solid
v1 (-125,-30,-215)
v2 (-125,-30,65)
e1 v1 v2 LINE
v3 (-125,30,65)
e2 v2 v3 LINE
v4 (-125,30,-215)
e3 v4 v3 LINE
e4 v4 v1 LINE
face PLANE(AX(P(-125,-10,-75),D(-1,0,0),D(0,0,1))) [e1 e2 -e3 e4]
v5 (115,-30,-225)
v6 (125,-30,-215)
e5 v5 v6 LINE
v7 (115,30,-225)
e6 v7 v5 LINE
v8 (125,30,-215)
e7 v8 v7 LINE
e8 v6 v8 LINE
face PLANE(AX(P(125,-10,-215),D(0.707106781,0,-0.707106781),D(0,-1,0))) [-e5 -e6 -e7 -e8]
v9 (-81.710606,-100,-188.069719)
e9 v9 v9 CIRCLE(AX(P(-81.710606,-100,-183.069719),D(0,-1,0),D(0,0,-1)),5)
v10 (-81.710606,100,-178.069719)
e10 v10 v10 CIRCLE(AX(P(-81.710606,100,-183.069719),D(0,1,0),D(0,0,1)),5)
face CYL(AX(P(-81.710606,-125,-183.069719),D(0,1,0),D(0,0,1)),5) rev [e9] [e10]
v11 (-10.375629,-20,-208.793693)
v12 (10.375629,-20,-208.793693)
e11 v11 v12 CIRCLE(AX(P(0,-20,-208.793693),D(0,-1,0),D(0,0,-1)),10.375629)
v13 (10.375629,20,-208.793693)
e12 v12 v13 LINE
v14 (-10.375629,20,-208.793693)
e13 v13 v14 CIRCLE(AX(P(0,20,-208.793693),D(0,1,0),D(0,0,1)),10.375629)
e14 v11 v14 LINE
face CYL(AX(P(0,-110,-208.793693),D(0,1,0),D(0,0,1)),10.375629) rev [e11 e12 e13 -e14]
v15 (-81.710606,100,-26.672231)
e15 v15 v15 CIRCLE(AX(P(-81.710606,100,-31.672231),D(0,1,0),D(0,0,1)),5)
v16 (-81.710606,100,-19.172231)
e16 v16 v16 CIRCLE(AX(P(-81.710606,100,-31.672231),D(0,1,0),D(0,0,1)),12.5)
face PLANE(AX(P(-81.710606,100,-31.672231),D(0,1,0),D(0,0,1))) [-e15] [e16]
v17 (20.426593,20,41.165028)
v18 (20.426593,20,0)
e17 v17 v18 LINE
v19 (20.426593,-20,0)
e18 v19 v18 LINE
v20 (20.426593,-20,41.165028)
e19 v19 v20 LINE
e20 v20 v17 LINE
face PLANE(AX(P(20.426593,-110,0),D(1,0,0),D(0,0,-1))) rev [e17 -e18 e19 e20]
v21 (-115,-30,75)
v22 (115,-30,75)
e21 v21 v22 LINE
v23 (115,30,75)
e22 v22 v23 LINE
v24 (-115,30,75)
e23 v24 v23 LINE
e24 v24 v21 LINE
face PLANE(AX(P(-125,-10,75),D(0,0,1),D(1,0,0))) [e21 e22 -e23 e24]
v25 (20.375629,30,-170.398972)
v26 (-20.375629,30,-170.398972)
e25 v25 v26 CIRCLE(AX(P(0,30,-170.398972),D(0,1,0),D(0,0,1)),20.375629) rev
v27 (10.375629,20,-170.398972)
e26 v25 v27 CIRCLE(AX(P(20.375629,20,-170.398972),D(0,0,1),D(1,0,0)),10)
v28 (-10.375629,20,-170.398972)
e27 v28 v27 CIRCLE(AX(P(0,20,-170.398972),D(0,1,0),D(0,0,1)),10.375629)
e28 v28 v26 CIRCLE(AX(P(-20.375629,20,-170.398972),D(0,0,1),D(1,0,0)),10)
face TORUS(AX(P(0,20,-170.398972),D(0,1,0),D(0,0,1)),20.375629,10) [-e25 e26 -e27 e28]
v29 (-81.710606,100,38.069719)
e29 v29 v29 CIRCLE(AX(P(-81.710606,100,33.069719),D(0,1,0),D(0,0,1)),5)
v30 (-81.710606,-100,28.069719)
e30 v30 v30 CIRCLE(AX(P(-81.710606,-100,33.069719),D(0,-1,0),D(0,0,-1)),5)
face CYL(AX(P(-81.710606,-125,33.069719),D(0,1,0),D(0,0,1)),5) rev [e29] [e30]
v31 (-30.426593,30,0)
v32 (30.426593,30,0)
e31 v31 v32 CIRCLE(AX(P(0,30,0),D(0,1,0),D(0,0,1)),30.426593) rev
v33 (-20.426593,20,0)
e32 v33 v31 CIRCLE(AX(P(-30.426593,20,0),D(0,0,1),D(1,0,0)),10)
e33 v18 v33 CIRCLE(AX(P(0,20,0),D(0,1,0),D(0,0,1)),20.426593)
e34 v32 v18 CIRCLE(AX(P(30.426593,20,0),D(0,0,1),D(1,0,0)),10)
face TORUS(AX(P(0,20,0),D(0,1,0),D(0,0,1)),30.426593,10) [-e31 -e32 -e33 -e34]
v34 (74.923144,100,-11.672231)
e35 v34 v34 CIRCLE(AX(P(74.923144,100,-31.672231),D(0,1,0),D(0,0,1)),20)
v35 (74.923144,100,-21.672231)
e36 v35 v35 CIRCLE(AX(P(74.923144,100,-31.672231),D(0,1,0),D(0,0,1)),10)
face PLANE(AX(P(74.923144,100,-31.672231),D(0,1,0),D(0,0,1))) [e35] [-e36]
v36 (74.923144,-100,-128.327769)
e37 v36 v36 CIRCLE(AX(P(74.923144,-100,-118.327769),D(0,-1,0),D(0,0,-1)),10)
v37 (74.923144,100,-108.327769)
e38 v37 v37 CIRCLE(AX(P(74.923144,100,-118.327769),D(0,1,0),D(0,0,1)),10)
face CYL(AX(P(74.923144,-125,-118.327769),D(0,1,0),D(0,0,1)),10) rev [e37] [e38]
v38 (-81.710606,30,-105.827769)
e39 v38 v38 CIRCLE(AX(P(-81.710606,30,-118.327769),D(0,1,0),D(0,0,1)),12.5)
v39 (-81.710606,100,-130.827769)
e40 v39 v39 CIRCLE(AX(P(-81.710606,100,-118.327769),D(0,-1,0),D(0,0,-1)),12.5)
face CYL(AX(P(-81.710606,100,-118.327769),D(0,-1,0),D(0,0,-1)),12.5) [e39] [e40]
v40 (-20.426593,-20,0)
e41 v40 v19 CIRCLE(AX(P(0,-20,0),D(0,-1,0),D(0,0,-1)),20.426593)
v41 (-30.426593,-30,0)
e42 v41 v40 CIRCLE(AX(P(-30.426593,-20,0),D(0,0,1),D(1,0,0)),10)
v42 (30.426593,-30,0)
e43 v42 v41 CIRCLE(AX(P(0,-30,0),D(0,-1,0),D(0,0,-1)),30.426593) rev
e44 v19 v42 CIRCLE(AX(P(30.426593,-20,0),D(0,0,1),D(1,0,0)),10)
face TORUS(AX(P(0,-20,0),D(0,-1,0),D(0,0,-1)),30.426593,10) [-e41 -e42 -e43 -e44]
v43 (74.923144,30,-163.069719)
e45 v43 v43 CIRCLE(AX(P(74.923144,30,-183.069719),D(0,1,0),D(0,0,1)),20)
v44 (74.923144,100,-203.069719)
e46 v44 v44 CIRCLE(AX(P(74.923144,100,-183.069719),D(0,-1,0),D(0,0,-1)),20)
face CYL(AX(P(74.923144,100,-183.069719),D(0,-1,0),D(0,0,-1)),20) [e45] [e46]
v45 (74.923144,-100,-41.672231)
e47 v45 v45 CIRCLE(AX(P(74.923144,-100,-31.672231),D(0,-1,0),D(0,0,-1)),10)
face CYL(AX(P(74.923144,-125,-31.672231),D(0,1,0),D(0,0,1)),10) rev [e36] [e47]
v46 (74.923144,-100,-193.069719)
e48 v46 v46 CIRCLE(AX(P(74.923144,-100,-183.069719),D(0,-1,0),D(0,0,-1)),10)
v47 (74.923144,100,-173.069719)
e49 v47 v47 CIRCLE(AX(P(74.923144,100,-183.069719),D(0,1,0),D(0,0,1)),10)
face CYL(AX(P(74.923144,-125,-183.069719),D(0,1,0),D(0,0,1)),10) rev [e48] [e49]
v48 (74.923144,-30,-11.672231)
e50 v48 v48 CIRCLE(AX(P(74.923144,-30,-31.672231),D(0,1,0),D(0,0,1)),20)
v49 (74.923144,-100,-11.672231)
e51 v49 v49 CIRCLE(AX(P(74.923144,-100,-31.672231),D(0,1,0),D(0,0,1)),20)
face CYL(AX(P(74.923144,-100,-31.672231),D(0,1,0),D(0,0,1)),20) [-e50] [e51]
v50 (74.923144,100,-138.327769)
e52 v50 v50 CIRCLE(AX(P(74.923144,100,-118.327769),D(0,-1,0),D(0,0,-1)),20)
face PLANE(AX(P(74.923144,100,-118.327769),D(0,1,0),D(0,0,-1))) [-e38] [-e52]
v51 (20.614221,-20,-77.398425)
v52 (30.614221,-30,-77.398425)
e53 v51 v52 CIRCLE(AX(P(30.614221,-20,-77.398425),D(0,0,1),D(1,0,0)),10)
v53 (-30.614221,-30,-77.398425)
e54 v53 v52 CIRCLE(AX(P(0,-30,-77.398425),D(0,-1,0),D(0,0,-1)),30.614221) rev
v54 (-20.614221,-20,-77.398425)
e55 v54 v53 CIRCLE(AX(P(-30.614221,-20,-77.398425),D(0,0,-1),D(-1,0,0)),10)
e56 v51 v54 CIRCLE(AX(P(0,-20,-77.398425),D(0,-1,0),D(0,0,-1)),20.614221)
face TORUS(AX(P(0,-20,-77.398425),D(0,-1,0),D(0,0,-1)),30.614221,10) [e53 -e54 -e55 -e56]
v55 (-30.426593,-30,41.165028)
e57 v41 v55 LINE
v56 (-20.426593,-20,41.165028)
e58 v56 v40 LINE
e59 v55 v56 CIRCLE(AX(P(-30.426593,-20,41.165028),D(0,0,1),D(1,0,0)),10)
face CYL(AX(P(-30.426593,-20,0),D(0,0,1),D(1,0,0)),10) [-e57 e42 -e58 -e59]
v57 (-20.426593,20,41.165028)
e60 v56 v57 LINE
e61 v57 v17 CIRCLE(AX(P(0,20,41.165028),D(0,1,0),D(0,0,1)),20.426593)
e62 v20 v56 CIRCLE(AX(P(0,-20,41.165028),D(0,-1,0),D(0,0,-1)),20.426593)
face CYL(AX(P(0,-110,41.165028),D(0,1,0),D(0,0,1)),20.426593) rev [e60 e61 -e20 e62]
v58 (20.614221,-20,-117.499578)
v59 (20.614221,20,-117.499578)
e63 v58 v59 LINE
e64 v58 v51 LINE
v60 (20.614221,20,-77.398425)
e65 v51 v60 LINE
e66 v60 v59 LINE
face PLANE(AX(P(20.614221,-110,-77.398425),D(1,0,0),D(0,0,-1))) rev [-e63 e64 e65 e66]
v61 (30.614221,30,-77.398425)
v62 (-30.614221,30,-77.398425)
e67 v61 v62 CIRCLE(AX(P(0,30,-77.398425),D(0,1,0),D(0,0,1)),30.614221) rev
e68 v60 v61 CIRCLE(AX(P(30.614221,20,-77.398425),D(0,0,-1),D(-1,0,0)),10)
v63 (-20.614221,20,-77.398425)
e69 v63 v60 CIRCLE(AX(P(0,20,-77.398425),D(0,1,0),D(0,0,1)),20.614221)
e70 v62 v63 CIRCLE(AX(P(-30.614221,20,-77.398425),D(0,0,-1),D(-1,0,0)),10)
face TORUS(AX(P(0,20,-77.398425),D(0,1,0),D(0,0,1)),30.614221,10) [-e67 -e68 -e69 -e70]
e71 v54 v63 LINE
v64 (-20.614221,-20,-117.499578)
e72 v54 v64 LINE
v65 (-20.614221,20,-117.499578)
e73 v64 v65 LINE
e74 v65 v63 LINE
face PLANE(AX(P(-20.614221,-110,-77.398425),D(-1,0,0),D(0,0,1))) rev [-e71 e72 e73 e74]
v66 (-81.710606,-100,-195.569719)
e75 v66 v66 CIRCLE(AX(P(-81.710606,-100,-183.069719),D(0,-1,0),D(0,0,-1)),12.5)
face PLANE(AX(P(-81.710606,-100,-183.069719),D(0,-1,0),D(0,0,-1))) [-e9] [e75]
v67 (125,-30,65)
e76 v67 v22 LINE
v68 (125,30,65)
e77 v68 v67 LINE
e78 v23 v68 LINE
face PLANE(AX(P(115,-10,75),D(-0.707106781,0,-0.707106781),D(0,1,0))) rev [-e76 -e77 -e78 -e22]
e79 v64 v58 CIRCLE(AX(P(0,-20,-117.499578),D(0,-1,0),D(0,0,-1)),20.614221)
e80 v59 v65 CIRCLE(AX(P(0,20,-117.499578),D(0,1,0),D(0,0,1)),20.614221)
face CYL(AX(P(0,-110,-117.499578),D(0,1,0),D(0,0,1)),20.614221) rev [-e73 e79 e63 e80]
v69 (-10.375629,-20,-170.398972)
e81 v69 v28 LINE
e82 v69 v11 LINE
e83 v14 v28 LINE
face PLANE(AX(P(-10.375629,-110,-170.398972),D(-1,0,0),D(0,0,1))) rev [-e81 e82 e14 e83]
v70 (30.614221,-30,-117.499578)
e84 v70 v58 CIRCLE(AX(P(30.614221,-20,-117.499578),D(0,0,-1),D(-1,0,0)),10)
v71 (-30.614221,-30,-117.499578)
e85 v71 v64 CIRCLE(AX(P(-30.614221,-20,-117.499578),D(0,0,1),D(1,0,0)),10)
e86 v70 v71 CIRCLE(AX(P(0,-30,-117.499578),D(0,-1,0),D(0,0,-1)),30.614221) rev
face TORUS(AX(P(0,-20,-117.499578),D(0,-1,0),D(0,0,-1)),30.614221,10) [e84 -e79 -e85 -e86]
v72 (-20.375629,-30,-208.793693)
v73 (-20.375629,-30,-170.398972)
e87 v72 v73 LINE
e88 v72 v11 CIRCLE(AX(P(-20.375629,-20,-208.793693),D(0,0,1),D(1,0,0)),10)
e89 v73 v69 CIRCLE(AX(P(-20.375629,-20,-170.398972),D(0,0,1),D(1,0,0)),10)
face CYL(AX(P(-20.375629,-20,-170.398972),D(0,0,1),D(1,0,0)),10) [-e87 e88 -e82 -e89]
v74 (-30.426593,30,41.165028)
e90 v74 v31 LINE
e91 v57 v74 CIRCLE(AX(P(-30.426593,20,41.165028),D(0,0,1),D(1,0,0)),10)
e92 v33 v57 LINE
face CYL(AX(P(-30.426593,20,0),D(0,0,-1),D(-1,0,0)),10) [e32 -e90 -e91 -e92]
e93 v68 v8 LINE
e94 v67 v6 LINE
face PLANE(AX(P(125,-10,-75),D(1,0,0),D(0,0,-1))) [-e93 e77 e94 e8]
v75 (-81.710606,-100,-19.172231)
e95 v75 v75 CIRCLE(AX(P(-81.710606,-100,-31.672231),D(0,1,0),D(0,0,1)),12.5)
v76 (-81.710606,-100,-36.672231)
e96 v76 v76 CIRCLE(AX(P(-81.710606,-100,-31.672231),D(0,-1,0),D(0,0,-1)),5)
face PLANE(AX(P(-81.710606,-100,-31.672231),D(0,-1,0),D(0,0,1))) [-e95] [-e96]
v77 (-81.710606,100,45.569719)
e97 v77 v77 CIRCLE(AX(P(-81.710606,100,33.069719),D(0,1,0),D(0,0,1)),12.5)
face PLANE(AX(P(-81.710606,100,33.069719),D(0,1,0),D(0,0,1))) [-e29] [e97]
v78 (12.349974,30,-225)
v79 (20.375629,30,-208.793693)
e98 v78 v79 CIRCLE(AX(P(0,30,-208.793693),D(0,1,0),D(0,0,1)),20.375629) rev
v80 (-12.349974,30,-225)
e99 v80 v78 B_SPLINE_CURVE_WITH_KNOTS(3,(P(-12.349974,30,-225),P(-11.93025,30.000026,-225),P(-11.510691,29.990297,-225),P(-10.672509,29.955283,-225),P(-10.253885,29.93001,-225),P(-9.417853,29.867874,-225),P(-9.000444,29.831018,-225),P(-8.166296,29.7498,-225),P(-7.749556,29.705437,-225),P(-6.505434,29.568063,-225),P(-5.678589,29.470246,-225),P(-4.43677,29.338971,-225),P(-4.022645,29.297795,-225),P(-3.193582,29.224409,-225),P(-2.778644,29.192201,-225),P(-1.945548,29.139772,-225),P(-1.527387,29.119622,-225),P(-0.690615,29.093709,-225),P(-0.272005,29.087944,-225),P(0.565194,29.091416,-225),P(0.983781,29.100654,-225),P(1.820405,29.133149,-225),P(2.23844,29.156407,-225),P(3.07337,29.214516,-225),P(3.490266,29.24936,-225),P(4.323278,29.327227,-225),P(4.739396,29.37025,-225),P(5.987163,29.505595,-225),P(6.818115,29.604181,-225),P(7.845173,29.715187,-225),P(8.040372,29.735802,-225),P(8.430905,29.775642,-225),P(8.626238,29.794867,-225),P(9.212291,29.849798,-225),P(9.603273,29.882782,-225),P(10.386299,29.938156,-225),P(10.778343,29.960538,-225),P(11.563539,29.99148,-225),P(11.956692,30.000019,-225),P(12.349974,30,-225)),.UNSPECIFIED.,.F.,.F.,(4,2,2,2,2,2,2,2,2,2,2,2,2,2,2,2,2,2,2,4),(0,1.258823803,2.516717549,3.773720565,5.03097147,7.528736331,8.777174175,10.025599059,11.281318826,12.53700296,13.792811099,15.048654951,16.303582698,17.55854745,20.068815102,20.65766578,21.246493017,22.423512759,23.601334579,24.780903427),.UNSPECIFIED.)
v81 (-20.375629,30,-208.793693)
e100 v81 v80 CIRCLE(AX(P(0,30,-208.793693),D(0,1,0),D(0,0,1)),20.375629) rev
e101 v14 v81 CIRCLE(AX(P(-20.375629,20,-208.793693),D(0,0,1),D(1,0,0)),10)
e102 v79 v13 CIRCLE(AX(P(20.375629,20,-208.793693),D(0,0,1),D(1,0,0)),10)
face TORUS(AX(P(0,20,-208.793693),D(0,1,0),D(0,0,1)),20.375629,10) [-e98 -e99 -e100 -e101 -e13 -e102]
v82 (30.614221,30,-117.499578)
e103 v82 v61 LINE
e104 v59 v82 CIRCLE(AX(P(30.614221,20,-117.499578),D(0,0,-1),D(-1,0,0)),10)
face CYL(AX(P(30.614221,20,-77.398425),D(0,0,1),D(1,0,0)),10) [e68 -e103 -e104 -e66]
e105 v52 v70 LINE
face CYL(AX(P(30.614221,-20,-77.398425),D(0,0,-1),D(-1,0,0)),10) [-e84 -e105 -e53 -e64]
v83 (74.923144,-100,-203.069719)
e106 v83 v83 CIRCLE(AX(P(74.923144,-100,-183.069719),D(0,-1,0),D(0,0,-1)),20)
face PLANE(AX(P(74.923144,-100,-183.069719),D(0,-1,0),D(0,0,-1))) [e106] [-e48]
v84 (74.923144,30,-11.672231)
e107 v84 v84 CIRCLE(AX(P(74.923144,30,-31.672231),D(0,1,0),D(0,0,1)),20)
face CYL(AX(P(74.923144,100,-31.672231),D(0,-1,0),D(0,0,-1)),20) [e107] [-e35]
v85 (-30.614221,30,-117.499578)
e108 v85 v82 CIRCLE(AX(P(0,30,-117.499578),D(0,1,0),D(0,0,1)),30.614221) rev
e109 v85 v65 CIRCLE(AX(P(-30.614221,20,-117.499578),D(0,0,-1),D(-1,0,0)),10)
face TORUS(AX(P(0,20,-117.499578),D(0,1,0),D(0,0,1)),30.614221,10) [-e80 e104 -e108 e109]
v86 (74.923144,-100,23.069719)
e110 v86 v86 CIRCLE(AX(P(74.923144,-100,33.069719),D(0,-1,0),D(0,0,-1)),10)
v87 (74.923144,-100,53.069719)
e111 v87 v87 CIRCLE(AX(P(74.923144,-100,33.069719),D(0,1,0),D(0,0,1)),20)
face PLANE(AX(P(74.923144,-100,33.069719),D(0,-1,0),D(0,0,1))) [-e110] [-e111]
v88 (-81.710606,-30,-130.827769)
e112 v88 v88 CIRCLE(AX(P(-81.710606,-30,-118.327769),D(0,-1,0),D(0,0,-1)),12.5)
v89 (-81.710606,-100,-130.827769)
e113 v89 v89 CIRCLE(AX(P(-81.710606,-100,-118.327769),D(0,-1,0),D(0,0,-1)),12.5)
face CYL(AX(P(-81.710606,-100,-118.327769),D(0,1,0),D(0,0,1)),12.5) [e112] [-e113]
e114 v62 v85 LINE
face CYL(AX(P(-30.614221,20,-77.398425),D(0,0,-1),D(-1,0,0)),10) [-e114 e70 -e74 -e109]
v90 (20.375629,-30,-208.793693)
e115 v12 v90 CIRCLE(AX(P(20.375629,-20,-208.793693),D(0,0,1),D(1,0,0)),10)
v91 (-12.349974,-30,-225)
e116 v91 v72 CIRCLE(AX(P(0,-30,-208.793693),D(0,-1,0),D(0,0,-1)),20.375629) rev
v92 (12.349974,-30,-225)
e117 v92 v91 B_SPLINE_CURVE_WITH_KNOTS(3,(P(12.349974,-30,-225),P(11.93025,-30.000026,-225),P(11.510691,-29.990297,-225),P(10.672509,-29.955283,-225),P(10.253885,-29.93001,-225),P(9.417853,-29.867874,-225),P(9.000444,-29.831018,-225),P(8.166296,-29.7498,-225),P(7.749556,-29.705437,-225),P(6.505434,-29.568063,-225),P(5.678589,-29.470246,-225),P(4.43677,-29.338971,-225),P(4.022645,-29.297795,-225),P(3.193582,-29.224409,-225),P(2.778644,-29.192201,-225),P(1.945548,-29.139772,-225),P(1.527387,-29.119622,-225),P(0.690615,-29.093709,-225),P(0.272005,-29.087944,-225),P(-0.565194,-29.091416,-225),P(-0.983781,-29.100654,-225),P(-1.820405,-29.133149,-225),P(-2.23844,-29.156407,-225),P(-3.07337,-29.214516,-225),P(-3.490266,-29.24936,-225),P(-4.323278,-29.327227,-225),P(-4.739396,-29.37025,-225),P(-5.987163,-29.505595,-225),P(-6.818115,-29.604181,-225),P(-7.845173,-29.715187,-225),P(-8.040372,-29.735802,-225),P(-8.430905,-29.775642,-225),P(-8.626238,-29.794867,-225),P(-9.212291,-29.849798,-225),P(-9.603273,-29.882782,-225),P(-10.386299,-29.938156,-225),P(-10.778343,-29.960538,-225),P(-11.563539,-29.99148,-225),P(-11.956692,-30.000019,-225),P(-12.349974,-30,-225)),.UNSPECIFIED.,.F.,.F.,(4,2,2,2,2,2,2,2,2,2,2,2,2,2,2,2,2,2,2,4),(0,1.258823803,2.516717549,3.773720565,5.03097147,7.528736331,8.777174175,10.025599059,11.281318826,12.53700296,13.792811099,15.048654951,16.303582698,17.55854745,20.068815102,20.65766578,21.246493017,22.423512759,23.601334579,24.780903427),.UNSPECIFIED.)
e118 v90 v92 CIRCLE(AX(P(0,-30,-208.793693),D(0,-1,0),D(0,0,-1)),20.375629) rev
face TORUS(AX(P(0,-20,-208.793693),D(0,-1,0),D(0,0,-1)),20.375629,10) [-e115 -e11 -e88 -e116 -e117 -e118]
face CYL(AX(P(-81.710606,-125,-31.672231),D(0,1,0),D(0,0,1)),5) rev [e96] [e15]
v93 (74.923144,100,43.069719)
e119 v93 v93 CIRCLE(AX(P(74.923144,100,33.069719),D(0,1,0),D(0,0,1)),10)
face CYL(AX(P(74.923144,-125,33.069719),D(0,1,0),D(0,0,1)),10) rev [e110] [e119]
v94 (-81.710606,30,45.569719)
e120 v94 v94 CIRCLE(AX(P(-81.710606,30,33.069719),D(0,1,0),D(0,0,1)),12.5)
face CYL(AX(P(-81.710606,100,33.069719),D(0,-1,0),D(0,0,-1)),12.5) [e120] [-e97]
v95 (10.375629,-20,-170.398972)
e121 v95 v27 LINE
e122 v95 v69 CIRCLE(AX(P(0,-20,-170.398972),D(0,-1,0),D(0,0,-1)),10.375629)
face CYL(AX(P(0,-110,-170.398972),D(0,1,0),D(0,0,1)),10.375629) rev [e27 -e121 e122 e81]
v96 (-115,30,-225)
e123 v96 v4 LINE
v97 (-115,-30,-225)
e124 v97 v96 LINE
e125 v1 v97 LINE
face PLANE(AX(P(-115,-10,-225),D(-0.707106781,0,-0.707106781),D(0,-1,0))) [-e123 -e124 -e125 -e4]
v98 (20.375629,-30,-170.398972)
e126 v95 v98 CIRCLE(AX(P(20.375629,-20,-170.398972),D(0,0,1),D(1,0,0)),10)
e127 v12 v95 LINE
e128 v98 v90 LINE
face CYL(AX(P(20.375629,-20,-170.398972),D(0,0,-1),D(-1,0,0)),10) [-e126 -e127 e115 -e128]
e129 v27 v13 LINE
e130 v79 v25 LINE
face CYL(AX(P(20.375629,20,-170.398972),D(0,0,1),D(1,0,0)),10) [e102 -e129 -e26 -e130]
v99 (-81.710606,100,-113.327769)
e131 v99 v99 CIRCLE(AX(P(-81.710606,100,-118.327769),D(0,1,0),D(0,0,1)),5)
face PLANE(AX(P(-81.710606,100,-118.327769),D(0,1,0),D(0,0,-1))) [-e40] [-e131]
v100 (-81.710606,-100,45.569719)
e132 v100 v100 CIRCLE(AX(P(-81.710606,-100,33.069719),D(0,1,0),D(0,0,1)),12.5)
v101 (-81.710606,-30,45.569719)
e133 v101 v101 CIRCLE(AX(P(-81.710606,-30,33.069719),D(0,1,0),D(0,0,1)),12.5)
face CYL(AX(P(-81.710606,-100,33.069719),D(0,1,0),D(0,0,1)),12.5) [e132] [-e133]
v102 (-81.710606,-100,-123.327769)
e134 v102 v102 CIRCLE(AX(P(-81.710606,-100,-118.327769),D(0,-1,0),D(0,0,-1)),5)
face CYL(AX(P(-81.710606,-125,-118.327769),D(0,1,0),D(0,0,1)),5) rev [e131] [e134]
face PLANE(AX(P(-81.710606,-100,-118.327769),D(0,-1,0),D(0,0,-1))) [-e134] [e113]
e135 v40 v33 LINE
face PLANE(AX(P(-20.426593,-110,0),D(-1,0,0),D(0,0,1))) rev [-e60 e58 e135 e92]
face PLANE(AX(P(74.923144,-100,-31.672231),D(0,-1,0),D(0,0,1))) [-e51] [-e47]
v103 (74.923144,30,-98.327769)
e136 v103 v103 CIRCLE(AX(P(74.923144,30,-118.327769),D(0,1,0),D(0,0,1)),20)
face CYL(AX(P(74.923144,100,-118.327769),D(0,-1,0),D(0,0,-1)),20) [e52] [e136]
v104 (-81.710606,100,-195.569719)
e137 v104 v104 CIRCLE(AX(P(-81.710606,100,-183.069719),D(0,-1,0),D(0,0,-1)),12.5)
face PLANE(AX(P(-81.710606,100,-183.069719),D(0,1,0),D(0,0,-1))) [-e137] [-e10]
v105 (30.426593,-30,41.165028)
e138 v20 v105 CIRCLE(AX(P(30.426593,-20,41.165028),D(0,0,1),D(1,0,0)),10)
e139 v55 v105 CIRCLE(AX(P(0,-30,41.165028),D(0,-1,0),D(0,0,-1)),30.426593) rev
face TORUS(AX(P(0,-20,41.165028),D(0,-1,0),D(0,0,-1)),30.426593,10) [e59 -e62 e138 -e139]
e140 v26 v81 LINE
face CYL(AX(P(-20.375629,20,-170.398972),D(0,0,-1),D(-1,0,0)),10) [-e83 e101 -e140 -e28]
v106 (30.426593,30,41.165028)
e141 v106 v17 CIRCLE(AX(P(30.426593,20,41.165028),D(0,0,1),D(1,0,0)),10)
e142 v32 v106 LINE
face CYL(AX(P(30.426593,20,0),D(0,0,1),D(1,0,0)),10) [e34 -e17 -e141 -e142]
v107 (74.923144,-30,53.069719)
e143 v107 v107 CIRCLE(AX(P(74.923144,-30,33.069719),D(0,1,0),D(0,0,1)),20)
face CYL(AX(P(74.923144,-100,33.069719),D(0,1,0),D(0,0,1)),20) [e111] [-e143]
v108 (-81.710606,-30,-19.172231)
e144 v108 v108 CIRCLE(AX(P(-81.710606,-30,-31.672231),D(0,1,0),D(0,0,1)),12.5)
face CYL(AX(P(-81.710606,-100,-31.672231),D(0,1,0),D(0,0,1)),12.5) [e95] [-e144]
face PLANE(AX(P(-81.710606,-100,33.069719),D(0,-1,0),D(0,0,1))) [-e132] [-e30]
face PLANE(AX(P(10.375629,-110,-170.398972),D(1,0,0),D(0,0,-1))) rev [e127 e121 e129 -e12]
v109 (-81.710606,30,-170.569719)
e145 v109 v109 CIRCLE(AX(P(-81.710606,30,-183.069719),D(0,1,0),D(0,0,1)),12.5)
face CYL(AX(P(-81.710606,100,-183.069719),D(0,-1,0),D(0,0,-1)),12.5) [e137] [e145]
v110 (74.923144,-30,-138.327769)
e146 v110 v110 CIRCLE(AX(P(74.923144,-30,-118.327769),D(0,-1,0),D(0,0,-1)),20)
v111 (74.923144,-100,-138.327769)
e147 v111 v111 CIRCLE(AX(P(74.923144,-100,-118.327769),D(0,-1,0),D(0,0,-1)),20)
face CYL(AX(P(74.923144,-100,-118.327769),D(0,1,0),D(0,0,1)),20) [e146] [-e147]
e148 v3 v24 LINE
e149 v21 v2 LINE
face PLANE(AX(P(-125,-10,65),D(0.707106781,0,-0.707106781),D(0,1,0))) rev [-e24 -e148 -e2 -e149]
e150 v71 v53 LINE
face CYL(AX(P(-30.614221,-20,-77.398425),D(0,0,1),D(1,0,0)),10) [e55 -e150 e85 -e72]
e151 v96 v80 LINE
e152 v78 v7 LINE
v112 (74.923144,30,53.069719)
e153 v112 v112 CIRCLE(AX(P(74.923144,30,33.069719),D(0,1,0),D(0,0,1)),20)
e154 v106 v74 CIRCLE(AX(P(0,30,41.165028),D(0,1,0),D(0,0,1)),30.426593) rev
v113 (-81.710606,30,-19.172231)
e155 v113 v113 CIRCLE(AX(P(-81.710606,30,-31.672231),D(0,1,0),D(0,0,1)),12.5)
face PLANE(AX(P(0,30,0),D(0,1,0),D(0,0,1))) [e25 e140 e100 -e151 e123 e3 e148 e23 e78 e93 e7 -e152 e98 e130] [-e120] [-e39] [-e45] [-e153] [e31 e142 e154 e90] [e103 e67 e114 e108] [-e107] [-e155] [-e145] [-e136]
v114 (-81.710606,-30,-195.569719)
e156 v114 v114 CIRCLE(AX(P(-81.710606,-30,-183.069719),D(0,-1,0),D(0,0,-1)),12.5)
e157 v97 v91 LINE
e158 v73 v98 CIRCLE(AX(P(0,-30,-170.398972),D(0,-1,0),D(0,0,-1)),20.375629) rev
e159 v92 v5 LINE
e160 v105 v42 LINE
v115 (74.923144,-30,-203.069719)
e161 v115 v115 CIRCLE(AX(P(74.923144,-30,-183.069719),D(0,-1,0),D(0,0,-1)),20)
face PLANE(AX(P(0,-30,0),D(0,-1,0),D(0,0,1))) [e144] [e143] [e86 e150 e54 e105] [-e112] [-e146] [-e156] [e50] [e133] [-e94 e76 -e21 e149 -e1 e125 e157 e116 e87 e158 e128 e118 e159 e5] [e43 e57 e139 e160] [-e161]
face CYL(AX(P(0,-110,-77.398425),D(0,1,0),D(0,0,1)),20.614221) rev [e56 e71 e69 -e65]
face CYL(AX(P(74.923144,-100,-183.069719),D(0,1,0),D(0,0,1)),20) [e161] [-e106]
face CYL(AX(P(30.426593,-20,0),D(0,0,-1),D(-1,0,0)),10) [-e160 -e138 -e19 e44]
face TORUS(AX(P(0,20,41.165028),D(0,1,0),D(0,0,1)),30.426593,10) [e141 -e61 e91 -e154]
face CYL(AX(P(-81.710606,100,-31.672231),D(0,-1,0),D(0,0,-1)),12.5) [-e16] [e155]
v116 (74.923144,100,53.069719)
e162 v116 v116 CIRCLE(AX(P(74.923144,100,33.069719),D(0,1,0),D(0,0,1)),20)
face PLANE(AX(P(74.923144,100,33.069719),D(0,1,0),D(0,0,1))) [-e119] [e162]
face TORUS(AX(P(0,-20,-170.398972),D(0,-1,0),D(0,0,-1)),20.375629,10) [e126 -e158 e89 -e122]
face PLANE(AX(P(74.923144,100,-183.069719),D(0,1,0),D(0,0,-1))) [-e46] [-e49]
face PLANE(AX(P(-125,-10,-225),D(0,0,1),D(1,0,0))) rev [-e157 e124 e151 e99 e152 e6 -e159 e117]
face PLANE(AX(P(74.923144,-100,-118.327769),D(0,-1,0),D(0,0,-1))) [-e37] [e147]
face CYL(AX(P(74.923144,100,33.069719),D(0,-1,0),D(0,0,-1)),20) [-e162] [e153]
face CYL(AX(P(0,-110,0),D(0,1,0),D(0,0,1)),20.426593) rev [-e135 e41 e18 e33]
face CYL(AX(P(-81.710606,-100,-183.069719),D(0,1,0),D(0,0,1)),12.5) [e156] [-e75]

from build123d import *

# Parameters (mm, degrees)
BOSS_EXTRUDE1_START   = -10
SKETCH2_W             = 250
SKETCH2_H             = 150
BOSS_EXTRUDE1_DEPTH   = 40
SKETCH4_R             = 12.5
SKETCH4_R_2           = 20
BOSS_EXTRUDE2_DEPTH   = 70
MIRROR1_START         = -30
MIRROR1_OUTLINE_W     = 250
MIRROR1_OUTLINE_H     = 300
MIRROR1_DEPTH         = 60
MIRROR1_START_2       = -100
MIRROR1_2_OUTLINE_R   = 12.5
MIRROR1_2_OUTLINE_R_2 = 20
MIRROR1_2_DEPTH       = 200
CHAMFER1_SIZE         = 10
SKETCH5_R             = 10
SKETCH5_R_2           = 5
CUT_EXTRUDE1_DEPTH    = 155
CUT_EXTRUDE2_DEPTH    = 140
FILLET1_R             = 10


# Read off the part's stored shape, not the designer's step: Mirror1
with BuildPart() as part:
    # Sketch2 → Boss-Extrude1 (new body)
    with BuildSketch(Plane(origin=(0, 0, 0), x_dir=(1, 0, 0), z_dir=(0, 1, 0)).offset(BOSS_EXTRUDE1_START)):
        Rectangle(SKETCH2_W, SKETCH2_H)
    extrude(amount=BOSS_EXTRUDE1_DEPTH)

    # Sketch4 → Boss-Extrude2 (add)
    with BuildSketch(Plane(origin=(0, 30, 0), x_dir=(1, 0, 0), z_dir=(0, 1, 0))):
        with Locations(Location((-81.710606218, -33.069718751, 0), (0, 0, 270))):
            Circle(SKETCH4_R)
        with Locations(Location((-81.710606218, 31.672231224, 0), (0, 0, 270))):
            Circle(SKETCH4_R)
        with Locations(Location((74.923143721, 31.672231224, 0), (0, 0, 270))):
            Circle(SKETCH4_R_2)
        with Locations(Location((74.923143721, -33.069718751, 0), (0, 0, 270))):
            Circle(SKETCH4_R_2)
    extrude(amount=BOSS_EXTRUDE2_DEPTH)

    # Mirror1 outline → Mirror1 (add)
    with BuildSketch(Plane(origin=(0, 0, 0), x_dir=(1, 0, 0), z_dir=(0, 1, 0)).offset(MIRROR1_START)):
        with Locations((0, 75)):
            Rectangle(MIRROR1_OUTLINE_W, MIRROR1_OUTLINE_H)
    extrude(amount=MIRROR1_DEPTH)

    # Mirror1 2 outline → Mirror1 2 (add)
    with BuildSketch(Plane(origin=(0, 0, 0), x_dir=(1, 0, 0), z_dir=(0, 1, 0)).offset(MIRROR1_START_2)):
        with Locations((-81.710606218, -33.069718751)):
            Circle(MIRROR1_2_OUTLINE_R)
        with Locations((-81.710606218, 31.672231224)):
            Circle(MIRROR1_2_OUTLINE_R)
        with Locations((74.923143721, 31.672231224)):
            Circle(MIRROR1_2_OUTLINE_R_2)
        with Locations((74.923143721, -33.069718751)):
            Circle(MIRROR1_2_OUTLINE_R_2)
        with Locations((-81.710606218, 183.069718751)):
            Circle(MIRROR1_2_OUTLINE_R)
        with Locations((-81.710606218, 118.327768776)):
            Circle(MIRROR1_2_OUTLINE_R)
        with Locations((74.923143721, 118.327768776)):
            Circle(MIRROR1_2_OUTLINE_R_2)
        with Locations((74.923143721, 183.069718751)):
            Circle(MIRROR1_2_OUTLINE_R_2)
    extrude(amount=MIRROR1_2_DEPTH)

    # Chamfer1
    chamfer1_edges = [part.edges().sort_by_distance(p)[0] for p in [
        (125, 0, -225),
        (-125, 0, -225),
        (125, 0, 75),
        (-125, 0, 75),
    ]]
    chamfer(chamfer1_edges, length=CHAMFER1_SIZE)

    # Sketch5 → Cut-Extrude1 (cut, symmetric)
    with BuildSketch(Plane(origin=(0, 30, 0), x_dir=(1, 0, 0), z_dir=(0, 1, 0))):
        with Locations(Location((74.923143721, 183.069718751, 0), (0, 0, 270))):
            Circle(SKETCH5_R)
        with Locations(Location((74.923143721, 118.327768776, 0), (0, 0, 270))):
            Circle(SKETCH5_R)
        with Locations(Location((74.923143721, 31.672231224, 0), (0, 0, 270))):
            Circle(SKETCH5_R)
        with Locations(Location((74.923143721, -33.069718751, 0), (0, 0, 270))):
            Circle(SKETCH5_R)
        with Locations(Location((-81.710606218, -33.069718751, 0), (0, 0, 270))):
            Circle(SKETCH5_R_2)
        with Locations(Location((-81.710606218, 31.672231224, 0), (0, 0, 270))):
            Circle(SKETCH5_R_2)
        with Locations(Location((-81.710606218, 118.327768776, 0), (0, 0, 270))):
            Circle(SKETCH5_R_2)
        with Locations(Location((-81.710606218, 183.069718751, 0), (0, 0, 270))):
            Circle(SKETCH5_R_2)
    extrude(amount=CUT_EXTRUDE1_DEPTH, both=True, mode=Mode.SUBTRACT)

    # Sketch7 → Cut-Extrude2 (cut, symmetric)
    with BuildSketch(Plane(origin=(0, 30, 0), x_dir=(1, 0, 0), z_dir=(0, 1, 0))):
        with BuildLine():
            Line((20.426592509, 0), (20.426592509, -41.165027597))
            ThreePointArc((20.426592509, -41.165027597), (0, -61.591620106), (-20.426592509, -41.165027597))
            Line((-20.426592509, -41.165027597), (-20.426592509, 0))
            ThreePointArc((-20.426592509, 0), (0, 20.426592509), (20.426592509, 0))
        make_face()
        with BuildLine():
            Line((-20.614221034, 77.398424778), (-20.614221034, 117.499578133))
            ThreePointArc((-20.614221034, 117.499578133), (0, 138.113799167), (20.614221034, 117.499578133))
            Line((20.614221034, 117.499578133), (20.614221034, 77.398424778))
            ThreePointArc((20.614221034, 77.398424778), (0, 56.784203744), (-20.614221034, 77.398424778))
        make_face()
        with BuildLine():
            Line((-10.375628688, 170.39897192), (-10.375628688, 208.793693217))
            ThreePointArc((-10.375628688, 208.793693217), (0, 219.169321905), (10.375628688, 208.793693217))
            Line((10.375628688, 208.793693217), (10.375628688, 170.39897192))
            ThreePointArc((10.375628688, 170.39897192), (0, 160.023343232), (-10.375628688, 170.39897192))
        make_face()
    extrude(amount=CUT_EXTRUDE2_DEPTH, both=True, mode=Mode.SUBTRACT)

    # Fillet1
    # the kernel refuses this fillet: 10 mm, written as the material it takes off along each edge
    with BuildSketch(Plane(origin=(10.375628688, -30, -208.793693217), x_dir=(1, 0, 0), z_dir=(0, 0, 1)), Plane(origin=(-10.375628688, -30, -170.39897192), x_dir=(-1, 0, 0), z_dir=(0, 0, -1)), Plane(origin=(-10.375628688, 30, -208.793693217), x_dir=(-1, 0, 0), z_dir=(0, 0, 1)), Plane(origin=(10.375628688, 30, -170.39897192), x_dir=(1, 0, 0), z_dir=(0, 0, -1))) as fillet1_piece_1:
        with BuildLine():
            CenterArc((FILLET1_R, FILLET1_R), FILLET1_R, 180, 90)
            Line((0, FILLET1_R), (0, 0))
            Line((0, 0), (FILLET1_R, 0))
        make_face()
    extrude(amount=38.394721297, mode=Mode.SUBTRACT)
    with BuildSketch(Plane(origin=(0, -30, -208.793693217), x_dir=(1, 0, 0), z_dir=(0, 0, 1))) as fillet1_piece_2:
        with BuildLine():
            CenterArc((10.375628688 + FILLET1_R, FILLET1_R), FILLET1_R, 180, 90)
            Line((10.375628688, FILLET1_R), (10.375628688, 0))
            Line((10.375628688, 0), (10.375628688 + FILLET1_R, 0))
        make_face()
    revolve(axis=Axis((0, -30, -208.793693217), (0, 1, 0)), revolution_arc=180, mode=Mode.SUBTRACT)
    with BuildSketch(Plane(origin=(0, -30, -170.39897192), x_dir=(-1, 0, 0), z_dir=(0, 0, -1))) as fillet1_piece_3:
        with BuildLine():
            CenterArc((10.375628688 + FILLET1_R, FILLET1_R), FILLET1_R, 180, 90)
            Line((10.375628688, FILLET1_R), (10.375628688, 0))
            Line((10.375628688, 0), (10.375628688 + FILLET1_R, 0))
        make_face()
    revolve(axis=Axis((0, -30, -170.39897192), (0, 1, 0)), revolution_arc=180, mode=Mode.SUBTRACT)
    with BuildSketch(Plane(origin=(20.614221034, -30, -117.499578133), x_dir=(1, 0, 0), z_dir=(0, 0, 1)), Plane(origin=(-20.614221034, -30, -77.398424778), x_dir=(-1, 0, 0), z_dir=(0, 0, -1)), Plane(origin=(-20.614221034, 30, -117.499578133), x_dir=(-1, 0, 0), z_dir=(0, 0, 1)), Plane(origin=(20.614221034, 30, -77.398424778), x_dir=(1, 0, 0), z_dir=(0, 0, -1))) as fillet1_piece_4:
        with BuildLine():
            CenterArc((FILLET1_R, FILLET1_R), FILLET1_R, 180, 90)
            Line((0, FILLET1_R), (0, 0))
            Line((0, 0), (FILLET1_R, 0))
        make_face()
    extrude(amount=40.101153355, mode=Mode.SUBTRACT)
    with BuildSketch(Plane(origin=(0, -30, -117.499578133), x_dir=(1, 0, 0), z_dir=(0, 0, 1))) as fillet1_piece_5:
        with BuildLine():
            CenterArc((20.614221034 + FILLET1_R, FILLET1_R), FILLET1_R, 180, 90)
            Line((20.614221034, FILLET1_R), (20.614221034, 0))
            Line((20.614221034, 0), (20.614221034 + FILLET1_R, 0))
        make_face()
    revolve(axis=Axis((0, -30, -117.499578133), (0, 1, 0)), revolution_arc=180, mode=Mode.SUBTRACT)
    with BuildSketch(Plane(origin=(0, -30, -77.398424778), x_dir=(-1, 0, 0), z_dir=(0, 0, -1))) as fillet1_piece_6:
        with BuildLine():
            CenterArc((20.614221034 + FILLET1_R, FILLET1_R), FILLET1_R, 180, 90)
            Line((20.614221034, FILLET1_R), (20.614221034, 0))
            Line((20.614221034, 0), (20.614221034 + FILLET1_R, 0))
        make_face()
    revolve(axis=Axis((0, -30, -77.398424778), (0, 1, 0)), revolution_arc=180, mode=Mode.SUBTRACT)
    with BuildSketch(Plane(origin=(-20.426592509, -30, 41.165027597), x_dir=(-1, 0, 0), z_dir=(0, 0, -1)), Plane(origin=(20.426592509, -30, 0), x_dir=(1, 0, 0), z_dir=(0, 0, 1)), Plane(origin=(20.426592509, 30, 41.165027597), x_dir=(1, 0, 0), z_dir=(0, 0, -1)), Plane(origin=(-20.426592509, 30, 0), x_dir=(-1, 0, 0), z_dir=(0, 0, 1))) as fillet1_piece_7:
        with BuildLine():
            CenterArc((FILLET1_R, FILLET1_R), FILLET1_R, 180, 90)
            Line((0, FILLET1_R), (0, 0))
            Line((0, 0), (FILLET1_R, 0))
        make_face()
    extrude(amount=41.165027597, mode=Mode.SUBTRACT)
    with BuildSketch(Plane(origin=(0, -30, 41.165027597), x_dir=(-1, 0, 0), z_dir=(0, 0, -1))) as fillet1_piece_8:
        with BuildLine():
            CenterArc((20.426592509 + FILLET1_R, FILLET1_R), FILLET1_R, 180, 90)
            Line((20.426592509, FILLET1_R), (20.426592509, 0))
            Line((20.426592509, 0), (20.426592509 + FILLET1_R, 0))
        make_face()
    revolve(axis=Axis((0, -30, 41.165027597), (0, 1, 0)), revolution_arc=180, mode=Mode.SUBTRACT)
    with BuildSketch(Plane(origin=(0, -30, 0), x_dir=(1, 0, 0), z_dir=(0, 0, 1))) as fillet1_piece_9:
        with BuildLine():
            CenterArc((20.426592509 + FILLET1_R, FILLET1_R), FILLET1_R, 180, 90)
            Line((20.426592509, FILLET1_R), (20.426592509, 0))
            Line((20.426592509, 0), (20.426592509 + FILLET1_R, 0))
        make_face()
    revolve(axis=Axis((0, -30, 0), (0, 1, 0)), revolution_arc=180, mode=Mode.SUBTRACT)
    with BuildSketch(Plane(origin=(0, 30, 0), x_dir=(1, 0, 0), z_dir=(0, 0, 1))) as fillet1_piece_10:
        with BuildLine():
            CenterArc((20.426592509 + FILLET1_R, -FILLET1_R), FILLET1_R, 90, 90)
            Line((20.426592509, -FILLET1_R), (20.426592509, 0))
            Line((20.426592509, 0), (20.426592509 + FILLET1_R, 0))
        make_face()
    revolve(axis=Axis((0, 30, 0), (0, 1, 0)), revolution_arc=180, mode=Mode.SUBTRACT)
    with BuildSketch(Plane(origin=(0, 30, 41.165027597), x_dir=(-1, 0, 0), z_dir=(0, 0, -1))) as fillet1_piece_11:
        with BuildLine():
            CenterArc((20.426592509 + FILLET1_R, -FILLET1_R), FILLET1_R, 90, 90)
            Line((20.426592509, -FILLET1_R), (20.426592509, 0))
            Line((20.426592509, 0), (20.426592509 + FILLET1_R, 0))
        make_face()
    revolve(axis=Axis((0, 30, 41.165027597), (0, 1, 0)), revolution_arc=180, mode=Mode.SUBTRACT)
    with BuildSketch(Plane(origin=(0, 30, -77.398424778), x_dir=(-1, 0, 0), z_dir=(0, 0, -1))) as fillet1_piece_12:
        with BuildLine():
            CenterArc((20.614221034 + FILLET1_R, -FILLET1_R), FILLET1_R, 90, 90)
            Line((20.614221034, -FILLET1_R), (20.614221034, 0))
            Line((20.614221034, 0), (20.614221034 + FILLET1_R, 0))
        make_face()
    revolve(axis=Axis((0, 30, -77.398424778), (0, 1, 0)), revolution_arc=180, mode=Mode.SUBTRACT)
    with BuildSketch(Plane(origin=(0, 30, -117.499578133), x_dir=(1, 0, 0), z_dir=(0, 0, 1))) as fillet1_piece_13:
        with BuildLine():
            CenterArc((20.614221034 + FILLET1_R, -FILLET1_R), FILLET1_R, 90, 90)
            Line((20.614221034, -FILLET1_R), (20.614221034, 0))
            Line((20.614221034, 0), (20.614221034 + FILLET1_R, 0))
        make_face()
    revolve(axis=Axis((0, 30, -117.499578133), (0, 1, 0)), revolution_arc=180, mode=Mode.SUBTRACT)
    with BuildSketch(Plane(origin=(0, 30, -170.39897192), x_dir=(-1, 0, 0), z_dir=(0, 0, -1))) as fillet1_piece_14:
        with BuildLine():
            CenterArc((10.375628688 + FILLET1_R, -FILLET1_R), FILLET1_R, 90, 90)
            Line((10.375628688, -FILLET1_R), (10.375628688, 0))
            Line((10.375628688, 0), (10.375628688 + FILLET1_R, 0))
        make_face()
    revolve(axis=Axis((0, 30, -170.39897192), (0, 1, 0)), revolution_arc=180, mode=Mode.SUBTRACT)
    with BuildSketch(Plane(origin=(0, 30, -208.793693217), x_dir=(1, 0, 0), z_dir=(0, 0, 1))) as fillet1_piece_15:
        with BuildLine():
            CenterArc((10.375628688 + FILLET1_R, -FILLET1_R), FILLET1_R, 90, 90)
            Line((10.375628688, -FILLET1_R), (10.375628688, 0))
            Line((10.375628688, 0), (10.375628688 + FILLET1_R, 0))
        make_face()
    revolve(axis=Axis((0, 30, -208.793693217), (0, 1, 0)), revolution_arc=180, mode=Mode.SUBTRACT)


solid = part.part
